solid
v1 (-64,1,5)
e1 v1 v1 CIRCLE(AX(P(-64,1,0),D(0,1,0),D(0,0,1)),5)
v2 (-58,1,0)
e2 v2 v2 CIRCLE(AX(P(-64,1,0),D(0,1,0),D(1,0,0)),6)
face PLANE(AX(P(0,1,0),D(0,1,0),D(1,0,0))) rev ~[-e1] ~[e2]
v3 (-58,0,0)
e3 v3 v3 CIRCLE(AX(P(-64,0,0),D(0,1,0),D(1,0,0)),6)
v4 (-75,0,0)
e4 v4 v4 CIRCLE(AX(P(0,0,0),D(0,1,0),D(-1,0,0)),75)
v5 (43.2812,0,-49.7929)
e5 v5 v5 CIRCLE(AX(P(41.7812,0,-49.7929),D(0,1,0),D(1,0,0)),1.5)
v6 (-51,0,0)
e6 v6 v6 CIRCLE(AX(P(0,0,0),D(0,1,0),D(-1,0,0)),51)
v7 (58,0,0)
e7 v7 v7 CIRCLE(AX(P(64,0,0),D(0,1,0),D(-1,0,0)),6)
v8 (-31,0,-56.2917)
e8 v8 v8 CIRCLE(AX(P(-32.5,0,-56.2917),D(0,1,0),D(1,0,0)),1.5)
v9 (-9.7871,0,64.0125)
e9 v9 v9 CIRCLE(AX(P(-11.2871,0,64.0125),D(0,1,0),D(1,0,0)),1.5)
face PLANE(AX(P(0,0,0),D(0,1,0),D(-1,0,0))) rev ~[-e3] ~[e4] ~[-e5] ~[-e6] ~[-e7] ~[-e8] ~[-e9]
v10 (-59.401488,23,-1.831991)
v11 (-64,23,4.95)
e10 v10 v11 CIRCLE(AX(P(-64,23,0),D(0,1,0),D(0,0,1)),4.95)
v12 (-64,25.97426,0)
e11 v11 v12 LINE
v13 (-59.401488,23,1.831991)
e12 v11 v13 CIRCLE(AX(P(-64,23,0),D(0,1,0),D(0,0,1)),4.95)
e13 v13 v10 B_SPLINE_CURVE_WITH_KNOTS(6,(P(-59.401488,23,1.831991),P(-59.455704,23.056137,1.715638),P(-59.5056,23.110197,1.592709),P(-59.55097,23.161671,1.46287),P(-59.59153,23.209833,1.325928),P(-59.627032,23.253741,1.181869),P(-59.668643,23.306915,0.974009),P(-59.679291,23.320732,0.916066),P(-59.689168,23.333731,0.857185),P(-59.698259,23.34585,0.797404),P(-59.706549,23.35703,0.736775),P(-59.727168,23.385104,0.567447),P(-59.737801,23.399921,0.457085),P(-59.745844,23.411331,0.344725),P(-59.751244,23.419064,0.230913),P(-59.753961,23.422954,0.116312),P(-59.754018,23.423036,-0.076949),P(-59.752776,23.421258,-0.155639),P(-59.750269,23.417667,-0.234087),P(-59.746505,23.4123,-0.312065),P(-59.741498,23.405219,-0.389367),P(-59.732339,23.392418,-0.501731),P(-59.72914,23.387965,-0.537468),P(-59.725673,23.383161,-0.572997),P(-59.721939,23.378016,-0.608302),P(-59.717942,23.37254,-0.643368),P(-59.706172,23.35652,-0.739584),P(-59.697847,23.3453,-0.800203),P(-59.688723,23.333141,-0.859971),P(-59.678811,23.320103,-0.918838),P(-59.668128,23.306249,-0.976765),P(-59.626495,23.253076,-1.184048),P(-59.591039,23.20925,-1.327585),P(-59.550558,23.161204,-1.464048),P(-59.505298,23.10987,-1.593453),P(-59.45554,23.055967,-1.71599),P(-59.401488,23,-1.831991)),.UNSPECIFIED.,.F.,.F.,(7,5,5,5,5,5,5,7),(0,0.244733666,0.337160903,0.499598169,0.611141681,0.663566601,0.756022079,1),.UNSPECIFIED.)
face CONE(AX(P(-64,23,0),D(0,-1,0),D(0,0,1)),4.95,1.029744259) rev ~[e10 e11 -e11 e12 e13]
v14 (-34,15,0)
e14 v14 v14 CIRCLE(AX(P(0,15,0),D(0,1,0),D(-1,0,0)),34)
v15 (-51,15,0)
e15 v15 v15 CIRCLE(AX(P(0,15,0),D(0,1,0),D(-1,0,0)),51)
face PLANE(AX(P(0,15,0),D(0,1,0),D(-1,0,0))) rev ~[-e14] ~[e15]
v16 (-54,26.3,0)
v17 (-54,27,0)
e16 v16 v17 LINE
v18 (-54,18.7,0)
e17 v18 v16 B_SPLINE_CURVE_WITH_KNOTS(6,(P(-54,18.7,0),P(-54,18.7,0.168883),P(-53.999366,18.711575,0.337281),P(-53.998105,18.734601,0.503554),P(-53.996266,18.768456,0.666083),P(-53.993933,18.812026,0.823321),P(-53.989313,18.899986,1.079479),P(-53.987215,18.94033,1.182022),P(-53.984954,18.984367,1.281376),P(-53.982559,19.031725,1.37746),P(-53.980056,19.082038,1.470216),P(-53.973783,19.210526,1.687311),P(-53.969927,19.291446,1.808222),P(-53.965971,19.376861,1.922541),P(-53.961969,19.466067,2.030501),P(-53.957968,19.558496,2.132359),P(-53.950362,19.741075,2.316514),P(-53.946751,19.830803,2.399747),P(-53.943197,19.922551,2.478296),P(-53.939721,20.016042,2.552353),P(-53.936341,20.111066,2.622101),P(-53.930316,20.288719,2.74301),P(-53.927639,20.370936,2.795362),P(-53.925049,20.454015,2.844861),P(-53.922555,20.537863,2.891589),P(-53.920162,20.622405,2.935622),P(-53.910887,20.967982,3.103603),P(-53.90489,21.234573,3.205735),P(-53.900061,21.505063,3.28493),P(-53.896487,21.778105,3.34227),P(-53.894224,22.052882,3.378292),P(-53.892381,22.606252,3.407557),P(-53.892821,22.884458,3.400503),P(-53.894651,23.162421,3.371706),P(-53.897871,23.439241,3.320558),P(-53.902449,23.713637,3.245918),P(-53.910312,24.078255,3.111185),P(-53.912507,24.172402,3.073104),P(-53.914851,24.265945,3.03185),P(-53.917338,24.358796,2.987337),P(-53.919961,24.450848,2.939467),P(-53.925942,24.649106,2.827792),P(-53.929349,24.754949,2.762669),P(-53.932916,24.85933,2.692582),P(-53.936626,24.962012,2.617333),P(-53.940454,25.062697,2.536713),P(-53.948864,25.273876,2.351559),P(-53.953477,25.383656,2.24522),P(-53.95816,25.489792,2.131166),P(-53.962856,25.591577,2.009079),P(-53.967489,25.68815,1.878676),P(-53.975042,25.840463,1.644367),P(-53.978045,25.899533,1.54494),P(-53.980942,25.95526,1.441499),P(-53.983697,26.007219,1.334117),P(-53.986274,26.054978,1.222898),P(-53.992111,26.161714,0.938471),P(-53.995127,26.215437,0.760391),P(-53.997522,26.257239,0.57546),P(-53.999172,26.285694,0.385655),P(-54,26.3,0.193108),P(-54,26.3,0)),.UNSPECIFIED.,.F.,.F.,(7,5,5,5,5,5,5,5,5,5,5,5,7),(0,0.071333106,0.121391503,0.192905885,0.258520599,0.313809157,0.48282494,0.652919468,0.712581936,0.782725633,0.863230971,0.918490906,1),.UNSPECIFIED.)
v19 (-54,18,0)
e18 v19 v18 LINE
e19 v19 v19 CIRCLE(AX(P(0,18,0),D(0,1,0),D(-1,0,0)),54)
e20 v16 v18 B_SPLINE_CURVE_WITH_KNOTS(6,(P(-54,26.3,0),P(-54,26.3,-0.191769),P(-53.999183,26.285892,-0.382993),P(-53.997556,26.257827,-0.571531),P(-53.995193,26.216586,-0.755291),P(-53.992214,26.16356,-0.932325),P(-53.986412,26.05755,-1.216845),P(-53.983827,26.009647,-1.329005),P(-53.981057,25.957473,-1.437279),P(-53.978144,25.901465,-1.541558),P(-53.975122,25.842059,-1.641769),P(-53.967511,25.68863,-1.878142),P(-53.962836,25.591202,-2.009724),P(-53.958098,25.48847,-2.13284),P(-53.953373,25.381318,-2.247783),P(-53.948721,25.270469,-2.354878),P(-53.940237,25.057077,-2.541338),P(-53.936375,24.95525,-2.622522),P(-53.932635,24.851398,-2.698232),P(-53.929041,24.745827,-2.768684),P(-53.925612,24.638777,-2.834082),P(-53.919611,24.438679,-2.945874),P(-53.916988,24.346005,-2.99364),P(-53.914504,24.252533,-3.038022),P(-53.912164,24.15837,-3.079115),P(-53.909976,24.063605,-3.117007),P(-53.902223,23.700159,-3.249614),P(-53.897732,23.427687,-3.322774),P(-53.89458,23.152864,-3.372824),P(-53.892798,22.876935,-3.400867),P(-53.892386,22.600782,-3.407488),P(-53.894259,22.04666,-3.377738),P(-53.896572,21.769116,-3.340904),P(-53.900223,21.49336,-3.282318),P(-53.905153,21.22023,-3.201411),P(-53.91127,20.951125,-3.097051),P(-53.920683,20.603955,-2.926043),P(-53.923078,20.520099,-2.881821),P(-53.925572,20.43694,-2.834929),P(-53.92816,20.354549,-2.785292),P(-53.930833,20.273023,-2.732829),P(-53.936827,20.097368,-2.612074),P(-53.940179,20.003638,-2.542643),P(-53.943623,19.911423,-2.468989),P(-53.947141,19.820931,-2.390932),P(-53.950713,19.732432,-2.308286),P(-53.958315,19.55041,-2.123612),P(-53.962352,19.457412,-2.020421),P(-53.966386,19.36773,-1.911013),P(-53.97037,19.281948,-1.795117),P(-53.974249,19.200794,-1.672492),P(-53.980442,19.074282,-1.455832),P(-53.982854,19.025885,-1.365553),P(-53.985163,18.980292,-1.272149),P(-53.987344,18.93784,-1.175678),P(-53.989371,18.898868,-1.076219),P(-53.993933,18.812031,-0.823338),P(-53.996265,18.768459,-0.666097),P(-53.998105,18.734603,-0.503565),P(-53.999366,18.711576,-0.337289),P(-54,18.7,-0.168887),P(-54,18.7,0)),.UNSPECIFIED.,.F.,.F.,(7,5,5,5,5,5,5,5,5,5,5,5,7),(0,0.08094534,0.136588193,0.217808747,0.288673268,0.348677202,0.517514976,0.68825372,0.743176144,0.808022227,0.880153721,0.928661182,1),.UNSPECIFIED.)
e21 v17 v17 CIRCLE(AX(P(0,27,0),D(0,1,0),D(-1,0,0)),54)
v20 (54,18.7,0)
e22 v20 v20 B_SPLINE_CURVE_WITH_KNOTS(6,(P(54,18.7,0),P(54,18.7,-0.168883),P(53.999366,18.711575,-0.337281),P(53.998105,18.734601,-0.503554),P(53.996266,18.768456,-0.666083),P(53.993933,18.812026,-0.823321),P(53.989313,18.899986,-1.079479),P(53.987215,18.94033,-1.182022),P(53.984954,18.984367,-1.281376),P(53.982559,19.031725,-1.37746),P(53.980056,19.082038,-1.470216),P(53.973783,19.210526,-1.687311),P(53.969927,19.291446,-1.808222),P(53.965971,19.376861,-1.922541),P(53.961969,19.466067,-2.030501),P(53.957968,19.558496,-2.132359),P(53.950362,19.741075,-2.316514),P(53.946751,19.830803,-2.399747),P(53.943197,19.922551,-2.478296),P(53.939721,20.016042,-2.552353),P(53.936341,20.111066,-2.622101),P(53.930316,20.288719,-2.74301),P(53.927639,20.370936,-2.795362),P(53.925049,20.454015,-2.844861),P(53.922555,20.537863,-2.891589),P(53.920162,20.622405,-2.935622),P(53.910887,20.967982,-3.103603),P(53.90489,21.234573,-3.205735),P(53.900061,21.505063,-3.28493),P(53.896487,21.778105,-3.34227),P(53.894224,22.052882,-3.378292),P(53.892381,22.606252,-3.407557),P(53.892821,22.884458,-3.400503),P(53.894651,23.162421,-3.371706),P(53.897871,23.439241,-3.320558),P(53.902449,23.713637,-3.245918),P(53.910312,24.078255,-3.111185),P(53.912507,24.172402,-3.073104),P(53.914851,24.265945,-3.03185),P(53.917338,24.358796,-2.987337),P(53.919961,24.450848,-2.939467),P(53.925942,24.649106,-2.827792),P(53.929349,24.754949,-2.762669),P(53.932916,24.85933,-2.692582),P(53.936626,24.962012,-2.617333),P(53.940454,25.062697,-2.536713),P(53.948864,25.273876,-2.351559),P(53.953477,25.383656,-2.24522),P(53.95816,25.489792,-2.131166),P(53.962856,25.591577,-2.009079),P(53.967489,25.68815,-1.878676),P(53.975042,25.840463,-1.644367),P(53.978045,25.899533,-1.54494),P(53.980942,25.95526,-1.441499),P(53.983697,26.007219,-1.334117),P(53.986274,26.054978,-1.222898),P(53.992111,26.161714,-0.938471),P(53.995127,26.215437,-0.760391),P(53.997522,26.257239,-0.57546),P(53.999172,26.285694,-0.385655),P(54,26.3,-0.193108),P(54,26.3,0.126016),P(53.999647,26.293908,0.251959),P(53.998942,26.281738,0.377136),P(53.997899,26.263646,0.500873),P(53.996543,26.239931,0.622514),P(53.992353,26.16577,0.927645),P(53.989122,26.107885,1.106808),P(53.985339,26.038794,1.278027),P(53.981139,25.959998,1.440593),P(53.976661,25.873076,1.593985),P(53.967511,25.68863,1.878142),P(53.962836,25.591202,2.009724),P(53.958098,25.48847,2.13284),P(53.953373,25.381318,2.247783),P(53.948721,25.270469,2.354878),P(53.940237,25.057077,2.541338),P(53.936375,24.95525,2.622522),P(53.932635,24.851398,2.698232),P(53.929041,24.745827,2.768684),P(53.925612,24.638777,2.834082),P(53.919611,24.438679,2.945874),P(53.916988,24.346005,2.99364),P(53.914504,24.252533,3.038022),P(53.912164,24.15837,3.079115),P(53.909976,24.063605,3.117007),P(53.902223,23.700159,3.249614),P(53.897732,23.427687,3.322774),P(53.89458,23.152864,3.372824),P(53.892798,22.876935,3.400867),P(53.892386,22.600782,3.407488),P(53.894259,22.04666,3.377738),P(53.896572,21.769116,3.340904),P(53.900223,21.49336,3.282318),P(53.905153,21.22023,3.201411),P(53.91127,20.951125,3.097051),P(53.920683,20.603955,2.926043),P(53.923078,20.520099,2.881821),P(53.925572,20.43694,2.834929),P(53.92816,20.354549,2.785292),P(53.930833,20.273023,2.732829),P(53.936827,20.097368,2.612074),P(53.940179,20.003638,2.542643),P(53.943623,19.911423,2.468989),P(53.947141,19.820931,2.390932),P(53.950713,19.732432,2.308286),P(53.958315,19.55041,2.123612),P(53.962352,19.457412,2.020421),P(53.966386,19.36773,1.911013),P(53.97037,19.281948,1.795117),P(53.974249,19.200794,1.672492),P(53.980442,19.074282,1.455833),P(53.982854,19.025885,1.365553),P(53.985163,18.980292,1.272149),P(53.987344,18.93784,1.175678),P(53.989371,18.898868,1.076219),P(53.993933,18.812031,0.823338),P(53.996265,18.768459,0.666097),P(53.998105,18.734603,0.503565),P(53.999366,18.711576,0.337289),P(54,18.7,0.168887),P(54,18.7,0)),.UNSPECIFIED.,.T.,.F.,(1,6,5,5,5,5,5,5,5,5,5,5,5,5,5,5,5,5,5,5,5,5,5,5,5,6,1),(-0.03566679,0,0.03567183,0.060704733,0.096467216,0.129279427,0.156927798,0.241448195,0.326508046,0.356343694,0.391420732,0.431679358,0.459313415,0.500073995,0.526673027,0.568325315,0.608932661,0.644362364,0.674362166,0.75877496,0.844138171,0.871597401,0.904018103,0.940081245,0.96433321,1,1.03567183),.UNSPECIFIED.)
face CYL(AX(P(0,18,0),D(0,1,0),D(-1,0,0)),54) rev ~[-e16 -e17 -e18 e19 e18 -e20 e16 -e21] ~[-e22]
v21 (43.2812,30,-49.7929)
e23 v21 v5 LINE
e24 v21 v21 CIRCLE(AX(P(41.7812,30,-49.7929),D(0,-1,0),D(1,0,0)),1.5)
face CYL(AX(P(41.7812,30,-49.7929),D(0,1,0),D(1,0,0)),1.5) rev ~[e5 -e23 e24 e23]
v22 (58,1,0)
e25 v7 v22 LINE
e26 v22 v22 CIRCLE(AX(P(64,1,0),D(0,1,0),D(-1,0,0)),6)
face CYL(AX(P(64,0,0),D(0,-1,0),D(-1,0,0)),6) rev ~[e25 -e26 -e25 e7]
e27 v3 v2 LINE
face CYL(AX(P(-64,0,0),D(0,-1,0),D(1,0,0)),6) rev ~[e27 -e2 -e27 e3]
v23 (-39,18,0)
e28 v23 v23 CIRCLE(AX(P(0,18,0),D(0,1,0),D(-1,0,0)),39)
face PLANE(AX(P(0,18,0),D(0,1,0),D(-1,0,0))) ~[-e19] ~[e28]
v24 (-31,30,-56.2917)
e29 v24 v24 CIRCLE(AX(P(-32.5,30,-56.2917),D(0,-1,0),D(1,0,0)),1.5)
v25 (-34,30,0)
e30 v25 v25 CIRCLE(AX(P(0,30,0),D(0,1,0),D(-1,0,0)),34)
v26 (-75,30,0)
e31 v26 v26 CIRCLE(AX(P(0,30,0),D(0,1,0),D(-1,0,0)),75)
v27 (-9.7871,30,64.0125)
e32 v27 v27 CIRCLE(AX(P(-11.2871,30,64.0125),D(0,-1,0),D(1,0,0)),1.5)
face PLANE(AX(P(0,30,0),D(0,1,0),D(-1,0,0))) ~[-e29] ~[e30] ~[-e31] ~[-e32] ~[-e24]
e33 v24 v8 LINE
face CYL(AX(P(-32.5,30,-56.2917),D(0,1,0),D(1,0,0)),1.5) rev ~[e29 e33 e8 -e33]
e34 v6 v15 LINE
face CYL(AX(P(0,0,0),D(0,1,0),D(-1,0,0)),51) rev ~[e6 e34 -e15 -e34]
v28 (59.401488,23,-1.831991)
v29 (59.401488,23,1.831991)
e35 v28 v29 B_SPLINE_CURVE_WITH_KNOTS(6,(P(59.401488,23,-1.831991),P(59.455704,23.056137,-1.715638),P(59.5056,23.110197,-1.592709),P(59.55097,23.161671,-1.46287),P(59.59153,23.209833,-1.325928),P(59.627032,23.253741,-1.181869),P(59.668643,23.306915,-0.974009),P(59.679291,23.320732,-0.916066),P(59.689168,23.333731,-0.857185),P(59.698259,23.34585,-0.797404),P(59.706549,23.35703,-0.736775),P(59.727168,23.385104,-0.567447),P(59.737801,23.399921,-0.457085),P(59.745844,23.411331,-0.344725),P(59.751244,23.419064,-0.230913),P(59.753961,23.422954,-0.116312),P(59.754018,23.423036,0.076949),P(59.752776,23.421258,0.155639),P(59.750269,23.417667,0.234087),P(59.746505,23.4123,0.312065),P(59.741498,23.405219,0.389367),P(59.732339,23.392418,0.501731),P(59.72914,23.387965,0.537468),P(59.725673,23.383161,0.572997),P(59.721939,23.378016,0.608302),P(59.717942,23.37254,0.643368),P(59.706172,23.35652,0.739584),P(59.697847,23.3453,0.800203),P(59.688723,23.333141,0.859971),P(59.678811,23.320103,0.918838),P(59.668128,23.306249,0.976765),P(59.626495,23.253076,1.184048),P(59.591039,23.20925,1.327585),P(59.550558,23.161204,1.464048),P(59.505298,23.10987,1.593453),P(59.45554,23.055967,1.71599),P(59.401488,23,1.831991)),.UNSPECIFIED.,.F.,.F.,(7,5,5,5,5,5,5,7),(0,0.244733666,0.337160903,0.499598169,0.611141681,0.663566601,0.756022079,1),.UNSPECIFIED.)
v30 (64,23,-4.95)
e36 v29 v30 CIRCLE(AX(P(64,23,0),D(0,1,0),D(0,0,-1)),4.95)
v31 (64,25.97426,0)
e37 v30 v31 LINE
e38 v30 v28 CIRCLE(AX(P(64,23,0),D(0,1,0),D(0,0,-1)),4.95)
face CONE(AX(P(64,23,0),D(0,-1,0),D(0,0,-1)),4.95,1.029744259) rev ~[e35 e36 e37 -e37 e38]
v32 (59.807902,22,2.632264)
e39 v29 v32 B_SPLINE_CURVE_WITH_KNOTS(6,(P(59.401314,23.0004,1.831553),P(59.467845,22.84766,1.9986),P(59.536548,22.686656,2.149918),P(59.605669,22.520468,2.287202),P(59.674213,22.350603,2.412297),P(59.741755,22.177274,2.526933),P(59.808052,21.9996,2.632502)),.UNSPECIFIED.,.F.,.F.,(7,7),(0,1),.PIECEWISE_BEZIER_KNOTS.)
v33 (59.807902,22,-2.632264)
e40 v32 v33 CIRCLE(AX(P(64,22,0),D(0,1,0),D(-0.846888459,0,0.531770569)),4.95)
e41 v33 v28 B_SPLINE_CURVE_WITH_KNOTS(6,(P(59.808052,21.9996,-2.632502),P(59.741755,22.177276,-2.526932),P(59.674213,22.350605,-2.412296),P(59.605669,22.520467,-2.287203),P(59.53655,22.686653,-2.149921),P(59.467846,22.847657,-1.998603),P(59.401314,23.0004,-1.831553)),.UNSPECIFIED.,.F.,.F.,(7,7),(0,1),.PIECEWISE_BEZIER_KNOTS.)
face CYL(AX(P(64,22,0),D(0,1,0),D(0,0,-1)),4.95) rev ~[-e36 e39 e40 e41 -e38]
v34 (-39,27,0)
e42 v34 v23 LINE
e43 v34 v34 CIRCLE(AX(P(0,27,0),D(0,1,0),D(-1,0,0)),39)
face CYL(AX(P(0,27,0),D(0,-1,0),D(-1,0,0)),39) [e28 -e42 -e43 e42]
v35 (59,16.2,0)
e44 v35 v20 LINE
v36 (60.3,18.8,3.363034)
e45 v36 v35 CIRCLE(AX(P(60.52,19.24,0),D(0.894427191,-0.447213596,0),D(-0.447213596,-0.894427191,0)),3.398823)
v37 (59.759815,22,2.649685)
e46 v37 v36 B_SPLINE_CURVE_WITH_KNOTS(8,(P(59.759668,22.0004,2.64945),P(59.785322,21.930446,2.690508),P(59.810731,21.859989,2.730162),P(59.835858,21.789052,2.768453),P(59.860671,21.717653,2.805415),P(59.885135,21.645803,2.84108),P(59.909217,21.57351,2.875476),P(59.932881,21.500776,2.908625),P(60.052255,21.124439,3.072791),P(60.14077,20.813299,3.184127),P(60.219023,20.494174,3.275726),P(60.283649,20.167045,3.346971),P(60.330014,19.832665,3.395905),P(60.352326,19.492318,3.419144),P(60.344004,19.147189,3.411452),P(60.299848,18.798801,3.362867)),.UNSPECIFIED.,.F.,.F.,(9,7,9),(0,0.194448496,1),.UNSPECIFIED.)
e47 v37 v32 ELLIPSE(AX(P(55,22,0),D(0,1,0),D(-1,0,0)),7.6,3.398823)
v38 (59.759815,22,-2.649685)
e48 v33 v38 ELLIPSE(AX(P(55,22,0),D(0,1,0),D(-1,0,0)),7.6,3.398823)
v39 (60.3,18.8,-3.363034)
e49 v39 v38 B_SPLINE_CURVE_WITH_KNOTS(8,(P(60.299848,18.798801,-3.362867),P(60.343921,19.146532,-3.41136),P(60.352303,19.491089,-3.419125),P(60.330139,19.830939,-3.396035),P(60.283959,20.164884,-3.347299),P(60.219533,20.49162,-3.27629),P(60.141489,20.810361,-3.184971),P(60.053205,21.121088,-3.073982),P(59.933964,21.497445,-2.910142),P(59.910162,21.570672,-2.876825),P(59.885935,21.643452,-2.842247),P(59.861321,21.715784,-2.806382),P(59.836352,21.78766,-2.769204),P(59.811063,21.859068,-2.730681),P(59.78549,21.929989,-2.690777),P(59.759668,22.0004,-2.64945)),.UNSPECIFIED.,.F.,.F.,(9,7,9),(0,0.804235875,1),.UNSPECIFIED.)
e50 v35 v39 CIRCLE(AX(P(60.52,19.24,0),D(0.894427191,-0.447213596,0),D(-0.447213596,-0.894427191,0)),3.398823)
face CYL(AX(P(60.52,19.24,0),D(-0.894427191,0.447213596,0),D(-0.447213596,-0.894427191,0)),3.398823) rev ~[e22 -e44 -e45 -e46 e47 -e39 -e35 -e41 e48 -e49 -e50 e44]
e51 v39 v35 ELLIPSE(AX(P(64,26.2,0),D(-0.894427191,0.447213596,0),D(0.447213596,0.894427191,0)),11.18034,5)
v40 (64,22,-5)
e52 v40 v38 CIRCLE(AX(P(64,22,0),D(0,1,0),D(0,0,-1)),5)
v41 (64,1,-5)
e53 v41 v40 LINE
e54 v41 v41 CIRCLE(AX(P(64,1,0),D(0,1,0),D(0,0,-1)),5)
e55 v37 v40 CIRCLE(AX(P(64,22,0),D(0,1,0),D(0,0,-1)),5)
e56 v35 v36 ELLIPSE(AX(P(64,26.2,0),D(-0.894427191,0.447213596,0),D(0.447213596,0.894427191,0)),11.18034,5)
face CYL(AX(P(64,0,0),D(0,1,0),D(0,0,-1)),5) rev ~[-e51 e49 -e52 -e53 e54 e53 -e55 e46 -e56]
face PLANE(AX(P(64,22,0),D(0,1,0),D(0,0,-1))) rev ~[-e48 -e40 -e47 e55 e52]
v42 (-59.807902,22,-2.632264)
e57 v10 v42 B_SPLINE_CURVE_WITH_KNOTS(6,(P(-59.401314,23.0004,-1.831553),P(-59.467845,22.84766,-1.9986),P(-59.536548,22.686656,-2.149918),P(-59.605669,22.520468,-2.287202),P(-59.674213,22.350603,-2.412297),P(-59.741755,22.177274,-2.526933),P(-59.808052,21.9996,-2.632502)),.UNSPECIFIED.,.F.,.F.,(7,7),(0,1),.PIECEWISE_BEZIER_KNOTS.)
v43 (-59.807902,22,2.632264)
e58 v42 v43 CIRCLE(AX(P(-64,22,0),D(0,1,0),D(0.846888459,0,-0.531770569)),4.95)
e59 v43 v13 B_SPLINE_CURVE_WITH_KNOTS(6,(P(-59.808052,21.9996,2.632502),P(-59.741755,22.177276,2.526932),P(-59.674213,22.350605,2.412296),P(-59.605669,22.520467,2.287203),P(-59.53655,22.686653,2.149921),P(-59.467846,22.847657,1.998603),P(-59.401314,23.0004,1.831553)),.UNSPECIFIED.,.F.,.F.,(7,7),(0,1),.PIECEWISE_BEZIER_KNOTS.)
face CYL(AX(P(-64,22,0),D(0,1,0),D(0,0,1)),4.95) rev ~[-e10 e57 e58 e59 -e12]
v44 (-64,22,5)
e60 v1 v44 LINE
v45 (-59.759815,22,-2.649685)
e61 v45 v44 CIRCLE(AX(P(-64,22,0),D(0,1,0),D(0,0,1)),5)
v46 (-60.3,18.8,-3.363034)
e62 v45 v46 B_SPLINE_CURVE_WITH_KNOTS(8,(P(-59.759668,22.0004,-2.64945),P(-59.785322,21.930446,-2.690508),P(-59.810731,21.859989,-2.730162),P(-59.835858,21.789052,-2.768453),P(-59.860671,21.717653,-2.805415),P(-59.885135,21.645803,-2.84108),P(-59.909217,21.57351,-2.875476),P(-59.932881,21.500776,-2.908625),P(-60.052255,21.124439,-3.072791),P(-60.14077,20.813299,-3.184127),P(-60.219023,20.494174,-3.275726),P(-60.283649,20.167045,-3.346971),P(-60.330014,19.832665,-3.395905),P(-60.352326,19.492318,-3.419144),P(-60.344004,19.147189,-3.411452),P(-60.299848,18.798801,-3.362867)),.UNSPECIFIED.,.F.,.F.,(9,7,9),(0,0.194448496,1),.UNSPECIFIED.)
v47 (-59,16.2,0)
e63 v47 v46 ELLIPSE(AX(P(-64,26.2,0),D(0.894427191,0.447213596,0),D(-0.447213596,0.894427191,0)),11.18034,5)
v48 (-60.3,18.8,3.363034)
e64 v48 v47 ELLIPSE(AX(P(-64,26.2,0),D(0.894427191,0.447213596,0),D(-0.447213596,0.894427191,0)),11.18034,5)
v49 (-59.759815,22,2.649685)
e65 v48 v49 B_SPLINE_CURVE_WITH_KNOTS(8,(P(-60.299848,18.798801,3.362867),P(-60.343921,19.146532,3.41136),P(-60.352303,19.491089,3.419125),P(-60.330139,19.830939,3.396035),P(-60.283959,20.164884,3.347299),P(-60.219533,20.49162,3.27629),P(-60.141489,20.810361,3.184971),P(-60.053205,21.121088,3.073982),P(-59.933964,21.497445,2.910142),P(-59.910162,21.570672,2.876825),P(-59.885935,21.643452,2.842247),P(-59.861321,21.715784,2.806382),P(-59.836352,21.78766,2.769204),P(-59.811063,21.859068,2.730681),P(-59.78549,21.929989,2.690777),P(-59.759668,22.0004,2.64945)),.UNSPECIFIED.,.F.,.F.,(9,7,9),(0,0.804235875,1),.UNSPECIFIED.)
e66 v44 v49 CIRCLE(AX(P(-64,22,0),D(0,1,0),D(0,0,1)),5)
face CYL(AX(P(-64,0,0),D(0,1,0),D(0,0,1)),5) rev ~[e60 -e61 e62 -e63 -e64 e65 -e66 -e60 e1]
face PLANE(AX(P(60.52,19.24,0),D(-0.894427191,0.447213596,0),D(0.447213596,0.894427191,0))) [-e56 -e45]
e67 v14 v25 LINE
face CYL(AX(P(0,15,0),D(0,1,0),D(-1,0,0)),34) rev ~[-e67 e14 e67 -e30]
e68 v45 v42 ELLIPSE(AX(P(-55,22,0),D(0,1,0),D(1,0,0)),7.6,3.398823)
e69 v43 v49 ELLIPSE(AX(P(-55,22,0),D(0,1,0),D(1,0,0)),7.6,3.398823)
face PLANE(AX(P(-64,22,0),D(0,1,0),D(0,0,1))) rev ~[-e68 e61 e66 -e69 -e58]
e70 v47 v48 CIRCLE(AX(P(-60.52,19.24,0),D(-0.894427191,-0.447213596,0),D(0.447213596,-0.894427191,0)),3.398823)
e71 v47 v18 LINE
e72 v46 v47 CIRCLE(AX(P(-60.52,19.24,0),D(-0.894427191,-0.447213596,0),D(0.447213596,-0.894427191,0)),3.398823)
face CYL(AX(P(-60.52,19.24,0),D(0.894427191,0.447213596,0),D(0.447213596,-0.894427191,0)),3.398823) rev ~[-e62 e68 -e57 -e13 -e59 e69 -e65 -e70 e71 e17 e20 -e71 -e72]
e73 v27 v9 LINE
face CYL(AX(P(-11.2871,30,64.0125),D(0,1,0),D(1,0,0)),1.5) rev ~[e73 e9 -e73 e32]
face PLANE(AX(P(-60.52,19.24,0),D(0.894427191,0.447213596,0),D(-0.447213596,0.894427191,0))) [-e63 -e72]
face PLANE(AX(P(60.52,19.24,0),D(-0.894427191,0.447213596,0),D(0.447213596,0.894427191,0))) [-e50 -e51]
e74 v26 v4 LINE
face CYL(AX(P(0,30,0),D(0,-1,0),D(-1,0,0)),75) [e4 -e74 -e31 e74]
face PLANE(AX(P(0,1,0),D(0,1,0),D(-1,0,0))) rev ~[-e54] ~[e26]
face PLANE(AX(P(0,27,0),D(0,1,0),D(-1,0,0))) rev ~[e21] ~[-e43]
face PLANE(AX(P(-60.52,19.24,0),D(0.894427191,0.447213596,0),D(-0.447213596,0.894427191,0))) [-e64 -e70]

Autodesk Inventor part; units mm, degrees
ref_plane "YZ Plane" through (0, 0, 0) normal (1, 0, 0) x (0, 1, 0)
ref_plane "XZ Plane" through (0, 0, 0) normal (0, 1, 0) x (-1, 0, 0)
ref_plane "XY Plane" through (0, 0, 0) normal (0, 0, 1) x (1, 0, 0)
sketch "Эскиз1" plane through (0, 0, 0) normal (0, 0, 1) x (1, 0, 0)
  line L0 (0, 0) -> (0, 20)
  line L1 (0, 0) -> (0, 24)
  line L2 (0, 0) -> (0, 30)
  line L3 (0, 30) -> (-75, 30)
  line L4 (-75, 30) -> (-75, 0)
  line L5 (-75, 0) -> (-51, 0)
  line L6 (-51, 0) -> (-51, 15)
  line L7 (-51, 15) -> (-34, 15)
  line L8 (-34, 15) -> (-34, 30)
  line L9 (-54, 27) -> (-39, 27)
  line L10 (-39, 27) -> (-39, 18)
  line L11 (-39, 18) -> (-54, 18)
  line L12 (-54, 18) -> (-54, 27)
  dimension "d20" = 30
  dimension "d21" = 75
  dimension "d22" = 24
  dimension "d23" = 15
  dimension "d24" = 17
revolve "Вращение1" add sketch "Эскиз1" angle 360 about axis through (0, 0, 0) along (0, 1, 0)
sketch "Эскиз2" plane through (0, 30, 0) normal (0, 1, 0) x (1, 0, 0)
  circle A0 centre (0, 0) radius 32 projected
  circle A1 centre (0, 0) radius 69 projected
  line L0 (0, 0) -> (41.7812, 49.7929)
  line L1 (0, 0) -> (65, 0) construction
  circle A2 centre (41.7812, 49.7929) radius 1.5
  line L2 (0, 0) -> (-32.5, 56.2917)
  line L3 (0, 0) -> (65, 0) construction
  circle A3 centre (-32.5, 56.2917) radius 1.5
  line L4 (0, 0) -> (-11.2871, -64.0125)
  line L5 (0, 0) -> (65, 0) construction
  circle A4 centre (-11.2871, -64.0125) radius 1.5
  dimension "d8" = 65
  dimension "d9" = 50
  dimension "d10" = 3
  dimension "d11" = 65
  dimension "d12" = 120
  dimension "d13" = 3
  dimension "d14" = 65
  dimension "d15" = 100
  dimension "d16" = 3
extrude "Выдавливание1" cut sketch "Эскиз2" against normal through all contours A2 | A3 | A4
sketch "Эскиз5" plane through (0, 0, 0) normal (0, 1, 0) x (-1, 0, 0)
  line L0 (0, 0) -> (-64, 0)
sketch "Эскиз4" plane through (0, 0, 0) normal (0, 1, 0) x (-1, 0, 0)
  circle A0 centre (-64, 0) radius 5 projected
  circle A1 centre (-64, 0) radius 6
  point P0 (0, 0)
  dimension "d27" = 12
extrude "Выдавливание3" cut sketch "Эскиз4" along normal blind 1
hole "Отверстие1" at (64, 0, 0) direction (0, 1, 0) diameter 9.9 depth 23 tip angle 118 counterbore diameter 10 counterbore depth 22
sketch "Эскиз6" plane through (0, 0, 0) normal (0, 0, 1) x (1, 0, 0)
  line L0 (54, 18) -> (54, 27) projected
  line L1 (54, 22.5) -> (59, 20)
  line L2 (68.95, 23) -> (59.05, 23) projected
  line L3 (59, 1) -> (59, 22) projected
  line L4 (59, 20) -> (59, 16.2)
  line L5 (59, 1) -> (59, 22) projected
  line L6 (51.0864, 23.9568) -> (54, 22.5)
  line L7 (59, 16.2) -> (49.5664, 20.9168)
  line L8 (49.5664, 20.9168) -> (51.0864, 23.9568)
  line L9 (59, 20) -> (60.52, 19.24)
  line L10 (60.52, 19.24) -> (59, 16.2)
  line L11 (-54, 18) -> (54, 18) projected
  point P0 (0, 0)
  point P1 (54, 18.7)
  dimension "d40" = 3.8
revolve "Вращение2" cut sketch "Эскиз6" angle 360 about axis through (54, 22.5, 0) along (0.8944272, -0.4472136, 0)
pattern_circular "Круговой массив1" count 2 over 360 about axis through (0, 22.5, 0) along (0, -1, 0) of "Вращение2", "Выдавливание3", "Отверстие1"
properties part number "Корпус сальника" material "Чугун, серый"
